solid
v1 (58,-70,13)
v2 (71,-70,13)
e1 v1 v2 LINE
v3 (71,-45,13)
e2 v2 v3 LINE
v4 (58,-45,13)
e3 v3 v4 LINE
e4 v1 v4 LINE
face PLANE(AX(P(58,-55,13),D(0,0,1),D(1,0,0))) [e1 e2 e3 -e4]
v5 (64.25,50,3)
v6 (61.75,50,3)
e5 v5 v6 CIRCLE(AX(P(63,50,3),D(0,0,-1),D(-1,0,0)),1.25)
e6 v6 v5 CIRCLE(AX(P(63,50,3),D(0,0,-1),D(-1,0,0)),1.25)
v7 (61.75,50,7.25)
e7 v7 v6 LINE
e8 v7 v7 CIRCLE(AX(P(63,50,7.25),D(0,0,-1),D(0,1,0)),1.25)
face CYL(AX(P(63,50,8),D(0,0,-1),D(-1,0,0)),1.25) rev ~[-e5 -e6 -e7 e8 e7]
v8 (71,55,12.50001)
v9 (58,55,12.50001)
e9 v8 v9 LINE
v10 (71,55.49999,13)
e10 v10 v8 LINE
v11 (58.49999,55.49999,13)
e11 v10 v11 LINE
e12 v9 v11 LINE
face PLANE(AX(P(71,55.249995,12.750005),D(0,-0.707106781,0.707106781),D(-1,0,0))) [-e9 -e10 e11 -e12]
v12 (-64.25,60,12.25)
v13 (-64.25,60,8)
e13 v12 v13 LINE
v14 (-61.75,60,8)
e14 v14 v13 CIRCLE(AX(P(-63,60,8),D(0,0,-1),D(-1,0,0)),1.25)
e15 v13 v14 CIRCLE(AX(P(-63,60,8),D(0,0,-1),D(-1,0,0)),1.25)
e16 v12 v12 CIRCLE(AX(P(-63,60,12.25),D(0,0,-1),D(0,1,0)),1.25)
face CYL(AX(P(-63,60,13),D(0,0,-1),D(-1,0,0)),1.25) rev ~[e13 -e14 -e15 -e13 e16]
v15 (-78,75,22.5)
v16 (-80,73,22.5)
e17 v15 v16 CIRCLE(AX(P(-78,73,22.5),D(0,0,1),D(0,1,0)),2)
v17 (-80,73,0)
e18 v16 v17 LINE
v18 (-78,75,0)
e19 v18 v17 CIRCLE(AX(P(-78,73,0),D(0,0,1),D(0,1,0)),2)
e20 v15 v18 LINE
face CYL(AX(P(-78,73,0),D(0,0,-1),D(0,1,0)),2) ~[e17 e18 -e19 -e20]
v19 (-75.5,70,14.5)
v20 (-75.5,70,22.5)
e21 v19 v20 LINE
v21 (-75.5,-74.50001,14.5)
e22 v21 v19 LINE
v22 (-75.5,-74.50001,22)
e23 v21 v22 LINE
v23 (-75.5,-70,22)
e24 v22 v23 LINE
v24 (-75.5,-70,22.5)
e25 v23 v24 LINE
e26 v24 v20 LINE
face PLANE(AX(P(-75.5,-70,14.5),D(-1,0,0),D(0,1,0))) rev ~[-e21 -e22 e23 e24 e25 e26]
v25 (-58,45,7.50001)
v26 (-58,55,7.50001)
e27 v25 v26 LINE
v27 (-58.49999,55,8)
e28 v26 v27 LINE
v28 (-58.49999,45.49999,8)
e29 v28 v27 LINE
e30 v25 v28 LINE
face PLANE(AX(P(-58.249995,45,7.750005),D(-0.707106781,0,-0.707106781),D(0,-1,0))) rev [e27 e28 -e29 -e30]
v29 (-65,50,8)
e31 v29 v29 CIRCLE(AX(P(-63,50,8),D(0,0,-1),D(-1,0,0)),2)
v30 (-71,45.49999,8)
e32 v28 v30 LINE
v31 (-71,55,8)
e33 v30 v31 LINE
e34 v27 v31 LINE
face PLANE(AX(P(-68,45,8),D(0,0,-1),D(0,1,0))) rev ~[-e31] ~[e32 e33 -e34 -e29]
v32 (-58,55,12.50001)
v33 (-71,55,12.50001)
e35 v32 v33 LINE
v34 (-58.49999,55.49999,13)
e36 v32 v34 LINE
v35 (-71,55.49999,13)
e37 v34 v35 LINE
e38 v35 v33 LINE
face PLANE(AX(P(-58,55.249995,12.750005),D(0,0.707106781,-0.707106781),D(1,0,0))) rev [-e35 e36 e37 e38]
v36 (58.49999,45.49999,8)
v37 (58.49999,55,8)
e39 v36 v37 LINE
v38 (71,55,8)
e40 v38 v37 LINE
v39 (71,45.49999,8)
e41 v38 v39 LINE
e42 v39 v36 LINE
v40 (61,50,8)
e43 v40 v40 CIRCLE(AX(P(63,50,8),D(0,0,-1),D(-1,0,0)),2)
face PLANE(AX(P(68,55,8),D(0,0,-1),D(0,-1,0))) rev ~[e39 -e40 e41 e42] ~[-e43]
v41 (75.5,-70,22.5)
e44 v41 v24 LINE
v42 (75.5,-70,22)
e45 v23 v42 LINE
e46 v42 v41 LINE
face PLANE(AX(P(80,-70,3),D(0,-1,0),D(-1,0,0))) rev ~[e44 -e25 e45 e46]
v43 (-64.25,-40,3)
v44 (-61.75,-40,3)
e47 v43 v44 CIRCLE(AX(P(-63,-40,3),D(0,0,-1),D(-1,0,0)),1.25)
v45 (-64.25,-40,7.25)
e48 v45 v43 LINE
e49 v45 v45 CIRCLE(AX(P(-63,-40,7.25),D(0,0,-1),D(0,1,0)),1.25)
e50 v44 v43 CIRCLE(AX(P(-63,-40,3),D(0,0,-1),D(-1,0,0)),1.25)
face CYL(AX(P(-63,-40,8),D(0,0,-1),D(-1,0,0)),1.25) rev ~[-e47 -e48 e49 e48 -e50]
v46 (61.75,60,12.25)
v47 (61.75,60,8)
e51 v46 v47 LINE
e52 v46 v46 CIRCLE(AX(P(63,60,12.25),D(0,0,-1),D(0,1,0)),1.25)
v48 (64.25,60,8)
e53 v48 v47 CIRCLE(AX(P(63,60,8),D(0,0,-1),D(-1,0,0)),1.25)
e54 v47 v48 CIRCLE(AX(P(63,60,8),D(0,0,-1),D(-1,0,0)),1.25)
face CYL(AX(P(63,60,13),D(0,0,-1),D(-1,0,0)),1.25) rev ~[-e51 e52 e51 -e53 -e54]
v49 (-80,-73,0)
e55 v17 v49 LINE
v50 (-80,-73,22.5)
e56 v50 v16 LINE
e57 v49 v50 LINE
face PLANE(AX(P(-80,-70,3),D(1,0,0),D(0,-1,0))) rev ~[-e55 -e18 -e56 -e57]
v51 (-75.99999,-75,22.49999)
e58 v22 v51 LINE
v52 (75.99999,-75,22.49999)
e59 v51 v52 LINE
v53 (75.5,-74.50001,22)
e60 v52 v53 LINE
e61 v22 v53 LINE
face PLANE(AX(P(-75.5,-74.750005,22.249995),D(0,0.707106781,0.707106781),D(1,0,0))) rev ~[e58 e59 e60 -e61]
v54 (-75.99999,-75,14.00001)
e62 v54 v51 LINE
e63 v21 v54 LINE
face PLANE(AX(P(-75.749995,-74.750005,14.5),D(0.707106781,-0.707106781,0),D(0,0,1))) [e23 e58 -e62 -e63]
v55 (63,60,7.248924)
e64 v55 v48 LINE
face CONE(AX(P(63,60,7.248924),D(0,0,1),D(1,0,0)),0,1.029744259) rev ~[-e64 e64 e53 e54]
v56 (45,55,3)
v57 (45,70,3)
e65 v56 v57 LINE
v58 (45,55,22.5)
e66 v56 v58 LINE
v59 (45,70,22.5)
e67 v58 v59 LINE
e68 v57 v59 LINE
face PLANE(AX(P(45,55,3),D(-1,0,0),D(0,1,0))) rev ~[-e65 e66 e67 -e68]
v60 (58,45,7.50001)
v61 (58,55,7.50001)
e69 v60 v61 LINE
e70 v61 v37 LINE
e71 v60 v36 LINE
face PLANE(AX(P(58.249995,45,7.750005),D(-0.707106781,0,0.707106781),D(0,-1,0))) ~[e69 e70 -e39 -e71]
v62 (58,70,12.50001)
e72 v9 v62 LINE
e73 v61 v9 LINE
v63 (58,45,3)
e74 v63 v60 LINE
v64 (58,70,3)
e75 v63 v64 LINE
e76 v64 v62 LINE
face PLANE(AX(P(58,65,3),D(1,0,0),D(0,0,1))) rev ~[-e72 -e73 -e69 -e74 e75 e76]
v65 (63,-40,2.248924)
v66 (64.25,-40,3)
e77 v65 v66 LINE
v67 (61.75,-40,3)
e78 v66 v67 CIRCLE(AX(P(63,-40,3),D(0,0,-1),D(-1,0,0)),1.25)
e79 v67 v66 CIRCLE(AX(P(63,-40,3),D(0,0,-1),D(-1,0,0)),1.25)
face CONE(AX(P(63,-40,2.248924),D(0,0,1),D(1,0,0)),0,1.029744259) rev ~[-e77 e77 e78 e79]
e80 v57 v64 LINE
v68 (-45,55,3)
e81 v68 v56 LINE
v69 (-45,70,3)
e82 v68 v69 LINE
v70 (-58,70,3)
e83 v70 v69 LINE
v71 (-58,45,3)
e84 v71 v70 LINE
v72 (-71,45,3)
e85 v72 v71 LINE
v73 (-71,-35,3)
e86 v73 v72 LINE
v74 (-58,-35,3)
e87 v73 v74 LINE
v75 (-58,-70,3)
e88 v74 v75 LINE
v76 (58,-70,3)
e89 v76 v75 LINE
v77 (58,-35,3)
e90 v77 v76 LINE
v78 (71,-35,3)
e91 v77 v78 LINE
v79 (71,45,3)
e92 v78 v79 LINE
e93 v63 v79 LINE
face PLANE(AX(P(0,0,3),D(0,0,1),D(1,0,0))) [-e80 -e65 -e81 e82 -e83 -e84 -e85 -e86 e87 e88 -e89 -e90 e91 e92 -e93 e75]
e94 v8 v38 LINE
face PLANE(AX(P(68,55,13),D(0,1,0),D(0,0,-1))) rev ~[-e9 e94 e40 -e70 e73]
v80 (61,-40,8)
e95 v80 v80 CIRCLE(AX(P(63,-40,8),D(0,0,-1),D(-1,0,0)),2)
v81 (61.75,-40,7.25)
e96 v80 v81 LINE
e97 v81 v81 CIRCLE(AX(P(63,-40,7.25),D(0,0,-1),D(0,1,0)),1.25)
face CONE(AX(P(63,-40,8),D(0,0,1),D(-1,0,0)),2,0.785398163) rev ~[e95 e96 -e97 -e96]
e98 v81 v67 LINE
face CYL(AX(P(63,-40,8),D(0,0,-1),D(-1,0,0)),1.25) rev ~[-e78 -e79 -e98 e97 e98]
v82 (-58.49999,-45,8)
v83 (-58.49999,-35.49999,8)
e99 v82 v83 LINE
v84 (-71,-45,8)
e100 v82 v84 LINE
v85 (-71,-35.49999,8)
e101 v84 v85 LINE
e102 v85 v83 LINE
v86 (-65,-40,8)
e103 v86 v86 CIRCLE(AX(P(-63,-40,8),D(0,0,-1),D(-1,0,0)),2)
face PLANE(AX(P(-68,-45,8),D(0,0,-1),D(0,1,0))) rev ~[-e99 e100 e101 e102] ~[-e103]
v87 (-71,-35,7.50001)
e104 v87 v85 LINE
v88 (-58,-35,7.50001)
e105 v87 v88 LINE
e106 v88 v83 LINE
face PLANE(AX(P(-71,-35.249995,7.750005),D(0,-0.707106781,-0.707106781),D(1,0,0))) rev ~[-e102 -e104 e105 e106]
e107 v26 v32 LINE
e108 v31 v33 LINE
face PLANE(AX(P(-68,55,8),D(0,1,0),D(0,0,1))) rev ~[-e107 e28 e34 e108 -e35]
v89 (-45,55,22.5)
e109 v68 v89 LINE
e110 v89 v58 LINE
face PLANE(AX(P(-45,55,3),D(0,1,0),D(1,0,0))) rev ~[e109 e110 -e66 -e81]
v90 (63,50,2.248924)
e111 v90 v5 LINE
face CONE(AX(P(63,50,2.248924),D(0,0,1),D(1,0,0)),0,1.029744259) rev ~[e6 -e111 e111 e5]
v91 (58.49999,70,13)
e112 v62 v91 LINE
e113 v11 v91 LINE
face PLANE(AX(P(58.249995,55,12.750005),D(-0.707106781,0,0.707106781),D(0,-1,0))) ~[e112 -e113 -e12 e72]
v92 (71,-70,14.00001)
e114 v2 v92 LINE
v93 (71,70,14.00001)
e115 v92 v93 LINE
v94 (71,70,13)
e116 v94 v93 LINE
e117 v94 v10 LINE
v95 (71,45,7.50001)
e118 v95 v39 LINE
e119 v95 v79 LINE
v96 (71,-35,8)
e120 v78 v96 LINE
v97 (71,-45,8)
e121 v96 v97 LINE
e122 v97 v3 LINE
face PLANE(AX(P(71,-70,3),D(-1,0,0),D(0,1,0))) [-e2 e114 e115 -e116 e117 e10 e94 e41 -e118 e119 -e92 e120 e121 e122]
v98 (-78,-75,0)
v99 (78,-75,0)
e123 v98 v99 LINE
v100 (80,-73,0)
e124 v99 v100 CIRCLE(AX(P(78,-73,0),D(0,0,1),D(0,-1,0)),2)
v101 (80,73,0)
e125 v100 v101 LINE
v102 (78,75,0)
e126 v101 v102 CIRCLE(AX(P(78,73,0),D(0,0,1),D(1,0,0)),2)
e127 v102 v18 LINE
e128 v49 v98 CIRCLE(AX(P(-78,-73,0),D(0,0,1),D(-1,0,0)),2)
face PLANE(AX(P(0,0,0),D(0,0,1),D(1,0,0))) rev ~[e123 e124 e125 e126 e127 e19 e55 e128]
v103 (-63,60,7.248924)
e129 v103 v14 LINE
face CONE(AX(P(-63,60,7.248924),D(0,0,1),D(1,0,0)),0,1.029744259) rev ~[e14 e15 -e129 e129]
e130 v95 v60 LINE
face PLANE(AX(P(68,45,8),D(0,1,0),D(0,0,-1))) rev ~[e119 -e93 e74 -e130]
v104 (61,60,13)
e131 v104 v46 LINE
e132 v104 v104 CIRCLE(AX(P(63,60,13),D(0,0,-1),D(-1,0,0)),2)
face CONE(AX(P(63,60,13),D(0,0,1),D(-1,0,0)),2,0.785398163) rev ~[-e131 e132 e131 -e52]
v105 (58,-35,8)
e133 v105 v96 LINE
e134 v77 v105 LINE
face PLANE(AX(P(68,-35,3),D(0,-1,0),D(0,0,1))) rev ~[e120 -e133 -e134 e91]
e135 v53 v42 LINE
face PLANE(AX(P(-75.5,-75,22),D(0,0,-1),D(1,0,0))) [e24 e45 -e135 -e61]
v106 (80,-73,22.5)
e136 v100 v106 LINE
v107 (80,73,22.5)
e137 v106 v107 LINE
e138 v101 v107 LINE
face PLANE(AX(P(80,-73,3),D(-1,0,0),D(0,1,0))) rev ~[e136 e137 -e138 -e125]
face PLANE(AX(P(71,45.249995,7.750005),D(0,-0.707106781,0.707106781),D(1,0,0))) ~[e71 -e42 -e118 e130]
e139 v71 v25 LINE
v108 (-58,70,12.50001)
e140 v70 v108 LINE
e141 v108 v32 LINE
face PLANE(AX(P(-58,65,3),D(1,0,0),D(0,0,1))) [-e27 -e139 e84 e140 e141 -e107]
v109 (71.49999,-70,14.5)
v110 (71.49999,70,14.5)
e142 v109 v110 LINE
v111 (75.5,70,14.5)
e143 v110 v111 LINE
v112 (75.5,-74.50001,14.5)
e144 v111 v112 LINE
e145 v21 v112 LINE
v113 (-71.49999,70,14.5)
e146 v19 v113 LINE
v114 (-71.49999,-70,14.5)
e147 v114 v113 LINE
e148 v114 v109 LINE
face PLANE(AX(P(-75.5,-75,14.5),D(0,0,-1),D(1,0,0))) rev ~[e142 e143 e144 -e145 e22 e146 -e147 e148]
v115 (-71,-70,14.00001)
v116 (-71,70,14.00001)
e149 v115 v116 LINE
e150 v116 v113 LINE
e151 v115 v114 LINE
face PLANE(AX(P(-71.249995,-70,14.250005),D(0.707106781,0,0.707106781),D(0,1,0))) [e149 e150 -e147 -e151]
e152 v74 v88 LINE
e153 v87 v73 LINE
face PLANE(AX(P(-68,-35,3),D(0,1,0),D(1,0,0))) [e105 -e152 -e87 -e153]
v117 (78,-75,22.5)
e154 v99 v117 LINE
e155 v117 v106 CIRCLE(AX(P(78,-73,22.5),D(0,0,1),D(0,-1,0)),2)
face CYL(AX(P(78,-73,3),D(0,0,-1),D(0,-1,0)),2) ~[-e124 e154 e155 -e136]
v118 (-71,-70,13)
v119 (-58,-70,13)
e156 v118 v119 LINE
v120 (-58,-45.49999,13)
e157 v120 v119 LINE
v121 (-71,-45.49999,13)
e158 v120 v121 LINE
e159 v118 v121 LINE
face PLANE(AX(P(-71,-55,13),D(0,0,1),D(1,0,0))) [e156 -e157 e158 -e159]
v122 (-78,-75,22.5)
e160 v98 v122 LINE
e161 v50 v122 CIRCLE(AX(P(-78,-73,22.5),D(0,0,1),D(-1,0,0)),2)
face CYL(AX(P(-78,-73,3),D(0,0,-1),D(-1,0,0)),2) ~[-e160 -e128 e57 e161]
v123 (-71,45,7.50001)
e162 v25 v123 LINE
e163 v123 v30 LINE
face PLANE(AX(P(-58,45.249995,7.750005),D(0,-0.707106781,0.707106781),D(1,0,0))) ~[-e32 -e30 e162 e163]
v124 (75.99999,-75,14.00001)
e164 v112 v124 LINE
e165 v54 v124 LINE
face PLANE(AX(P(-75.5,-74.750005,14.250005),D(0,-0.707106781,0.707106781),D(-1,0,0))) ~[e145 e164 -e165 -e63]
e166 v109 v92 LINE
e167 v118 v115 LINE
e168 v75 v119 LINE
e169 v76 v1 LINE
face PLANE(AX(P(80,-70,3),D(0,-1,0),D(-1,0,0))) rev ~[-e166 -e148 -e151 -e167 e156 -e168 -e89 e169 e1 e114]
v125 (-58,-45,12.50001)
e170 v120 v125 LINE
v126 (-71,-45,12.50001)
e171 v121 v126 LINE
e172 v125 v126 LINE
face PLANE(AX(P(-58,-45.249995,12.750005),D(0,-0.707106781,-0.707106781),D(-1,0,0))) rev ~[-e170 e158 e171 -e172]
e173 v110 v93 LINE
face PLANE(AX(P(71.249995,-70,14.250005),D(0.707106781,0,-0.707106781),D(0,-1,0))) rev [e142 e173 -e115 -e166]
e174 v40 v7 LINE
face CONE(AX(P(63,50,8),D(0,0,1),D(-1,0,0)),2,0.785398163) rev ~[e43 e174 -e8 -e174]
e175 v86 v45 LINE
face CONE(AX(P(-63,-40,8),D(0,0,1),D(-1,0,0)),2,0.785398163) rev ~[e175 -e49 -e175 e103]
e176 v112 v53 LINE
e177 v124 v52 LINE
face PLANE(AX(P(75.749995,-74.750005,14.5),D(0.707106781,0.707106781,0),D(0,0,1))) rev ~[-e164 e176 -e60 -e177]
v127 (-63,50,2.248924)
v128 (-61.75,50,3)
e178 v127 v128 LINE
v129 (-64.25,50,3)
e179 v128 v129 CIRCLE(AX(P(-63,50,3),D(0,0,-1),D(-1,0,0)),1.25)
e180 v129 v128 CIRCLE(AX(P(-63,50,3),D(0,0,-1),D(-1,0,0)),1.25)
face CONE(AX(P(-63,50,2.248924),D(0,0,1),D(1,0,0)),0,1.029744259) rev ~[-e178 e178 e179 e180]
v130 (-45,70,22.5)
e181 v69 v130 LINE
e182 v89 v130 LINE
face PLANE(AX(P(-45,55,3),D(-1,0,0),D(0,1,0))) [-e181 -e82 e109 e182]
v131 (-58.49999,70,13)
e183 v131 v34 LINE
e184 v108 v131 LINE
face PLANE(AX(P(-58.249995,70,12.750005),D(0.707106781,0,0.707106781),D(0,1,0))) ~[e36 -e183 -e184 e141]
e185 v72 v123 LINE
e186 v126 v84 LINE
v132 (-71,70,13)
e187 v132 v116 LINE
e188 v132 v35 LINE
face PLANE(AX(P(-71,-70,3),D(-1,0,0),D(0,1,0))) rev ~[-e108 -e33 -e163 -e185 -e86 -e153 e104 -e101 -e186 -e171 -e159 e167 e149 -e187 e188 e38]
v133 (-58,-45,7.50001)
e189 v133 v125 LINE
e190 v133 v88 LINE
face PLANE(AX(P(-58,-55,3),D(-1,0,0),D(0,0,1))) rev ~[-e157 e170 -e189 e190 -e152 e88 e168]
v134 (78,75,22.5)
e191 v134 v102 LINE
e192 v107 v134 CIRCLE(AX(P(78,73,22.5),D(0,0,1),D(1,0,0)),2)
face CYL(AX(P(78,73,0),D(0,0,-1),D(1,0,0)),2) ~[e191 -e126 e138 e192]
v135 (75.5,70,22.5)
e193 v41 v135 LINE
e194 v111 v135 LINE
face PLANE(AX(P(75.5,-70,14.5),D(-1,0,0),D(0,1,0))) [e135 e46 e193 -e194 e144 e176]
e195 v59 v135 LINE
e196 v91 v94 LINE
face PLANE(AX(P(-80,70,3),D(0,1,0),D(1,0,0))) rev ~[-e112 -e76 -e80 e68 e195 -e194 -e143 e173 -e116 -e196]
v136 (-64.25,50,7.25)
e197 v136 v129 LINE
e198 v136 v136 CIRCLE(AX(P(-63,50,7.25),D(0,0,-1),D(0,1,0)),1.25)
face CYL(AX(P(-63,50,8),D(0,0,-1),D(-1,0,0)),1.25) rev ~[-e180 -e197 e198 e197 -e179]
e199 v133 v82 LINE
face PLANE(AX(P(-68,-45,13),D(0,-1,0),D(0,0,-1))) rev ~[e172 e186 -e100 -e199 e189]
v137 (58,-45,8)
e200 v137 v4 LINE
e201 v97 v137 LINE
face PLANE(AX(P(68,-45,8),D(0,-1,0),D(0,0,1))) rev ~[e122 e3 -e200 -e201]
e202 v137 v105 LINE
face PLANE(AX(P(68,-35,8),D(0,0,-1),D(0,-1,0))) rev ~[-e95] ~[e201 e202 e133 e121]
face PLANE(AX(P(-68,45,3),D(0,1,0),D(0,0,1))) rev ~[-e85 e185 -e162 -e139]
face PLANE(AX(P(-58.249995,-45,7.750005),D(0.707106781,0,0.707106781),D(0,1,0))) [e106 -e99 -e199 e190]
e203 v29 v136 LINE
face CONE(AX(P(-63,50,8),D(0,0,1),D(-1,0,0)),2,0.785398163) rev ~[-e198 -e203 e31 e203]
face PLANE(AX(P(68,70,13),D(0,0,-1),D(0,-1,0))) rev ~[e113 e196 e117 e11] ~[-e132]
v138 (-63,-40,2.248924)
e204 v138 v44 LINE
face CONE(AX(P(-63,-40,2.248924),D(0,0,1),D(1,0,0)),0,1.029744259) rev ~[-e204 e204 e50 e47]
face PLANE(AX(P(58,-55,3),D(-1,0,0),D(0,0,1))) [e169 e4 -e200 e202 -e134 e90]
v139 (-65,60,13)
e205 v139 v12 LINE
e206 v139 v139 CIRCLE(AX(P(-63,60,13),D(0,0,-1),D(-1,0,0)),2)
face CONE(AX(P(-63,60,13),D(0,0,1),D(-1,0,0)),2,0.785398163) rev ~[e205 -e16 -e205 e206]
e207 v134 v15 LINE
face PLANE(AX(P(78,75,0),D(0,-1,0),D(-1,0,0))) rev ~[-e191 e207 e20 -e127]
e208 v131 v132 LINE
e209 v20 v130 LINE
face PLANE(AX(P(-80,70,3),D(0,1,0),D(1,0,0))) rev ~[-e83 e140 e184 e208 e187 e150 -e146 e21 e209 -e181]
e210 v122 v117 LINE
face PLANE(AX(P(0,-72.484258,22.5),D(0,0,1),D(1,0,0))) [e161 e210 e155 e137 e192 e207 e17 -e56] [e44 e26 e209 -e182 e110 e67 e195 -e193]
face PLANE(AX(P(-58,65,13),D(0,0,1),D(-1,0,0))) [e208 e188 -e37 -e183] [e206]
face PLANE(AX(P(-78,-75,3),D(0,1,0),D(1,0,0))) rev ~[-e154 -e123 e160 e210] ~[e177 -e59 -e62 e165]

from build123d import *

# Parameters (mm, degrees)
F1_DEPTH             = 3
F2_W                 = 10
F2_H                 = 10
F3_DEPTH             = 5
F5_W                 = 10
F5_H                 = 10
F6_DEPTH             = 10
F8_D                 = 2.5
F8_DEPTH             = 5
F8_CSINK_D           = 4
F8_CSINK_ANGLE       = 90
F8_TIP               = 0.7510757738
F8_ON_F4_D           = 2.5
F8_ON_F4_DEPTH       = 5
F8_ON_F4_CSINK_D     = 4
F8_ON_F4_CSINK_ANGLE = 90
F8_ON_F4_TIP         = 0.7510757738
F9_W                 = 9
F9_H                 = 140
F10_DEPTH            = 11.5
F11_W                = 4.5
F11_H                = 140
F12_DEPTH            = 8
F14_DEPTH            = 19.5
F15_W                = 151
F15_H                = 7.5
F16_DEPTH            = 5
F18_DEPTH            = 3
F19_W                = 13
F19_H                = 10
F19_W_2              = 10
F20_DEPTH            = 5
F22_DEPTH            = 3
F23_W                = 13
F23_H                = 10
F24_DEPTH            = 15
F25_W                = 90
F25_H                = 15
F26_DEPTH            = 19.5
F27_SIZE             = 0.49999


# Not quite as in the source:
# - a fillet or chamfer is up to 0.001 mm smaller than in the source, because OpenCascade refuses the exact size
# - a feature names something its author has since deleted; it is built from what else it names


with BuildPart() as f1:
    # F0 (on Top) → F1 (new body)
    with BuildSketch(Plane.XY):
        with BuildLine():
            Line((-78, -75), (78, -75))
            ThreePointArc((78, -75), (79.4142135624, -74.4142135624), (80, -73))
            Line((80, -73), (80, 73))
            ThreePointArc((80, 73), (79.4142135624, 74.4142135624), (78, 75))
            Line((78, 75), (-78, 75))
            ThreePointArc((-78, 75), (-79.4142135624, 74.4142135624), (-80, 73))
            Line((-80, 73), (-80, -73))
            ThreePointArc((-80, -73), (-79.4142135624, -74.4142135624), (-78, -75))
        make_face()
    extrude(amount=F1_DEPTH)

    # F2 (on face) → F3 (join)
    with BuildSketch(Plane.XY.offset(3)):
        with Locations((-63, -40)):
            Rectangle(F2_W, F2_H)
        with Locations((-63, 50)):
            Rectangle(F2_W, F2_H)
        with Locations((63, 50)):
            Rectangle(F2_W, F2_H)
        with Locations((63, -40)):
            Rectangle(F2_W, F2_H)
    extrude(amount=F3_DEPTH)

    # F5 (on face) → F6 (join)
    with BuildSketch(Plane.XY.offset(3)):
        with Locations((-63, 60)):
            Rectangle(F5_W, F5_H)
        with Locations((-63, -50)):
            Rectangle(F5_W, F5_H)
        with Locations((63, 60)):
            Rectangle(F5_W, F5_H)
        with Locations((63, -50)):
            Rectangle(F5_W, F5_H)
    extrude(amount=F6_DEPTH)

    # F8
    with Locations(Plane.XY.offset(13)):
        with Locations((-63, 60), (63, 60)):
            CounterSinkHole(F8_D / 2, F8_CSINK_D / 2, depth=F8_DEPTH, counter_sink_angle=F8_CSINK_ANGLE)
            with Locations((0, 0, -(F8_DEPTH + F8_TIP / 2))):  # 118° drill point
                Cone(0, F8_D / 2, F8_TIP, mode=Mode.SUBTRACT)

    # F8 on F4
    with Locations(Plane.XY.offset(8)):
        with Locations((-63, -40), (63, -40), (-63, 50), (63, 50)):
            CounterSinkHole(F8_ON_F4_D / 2, F8_ON_F4_CSINK_D / 2, depth=F8_ON_F4_DEPTH, counter_sink_angle=F8_ON_F4_CSINK_ANGLE)
            with Locations((0, 0, -(F8_ON_F4_DEPTH + F8_ON_F4_TIP / 2))):  # 118° drill point
                Cone(0, F8_ON_F4_D / 2, F8_ON_F4_TIP, mode=Mode.SUBTRACT)

    # F9 (on face) → F10 (join)
    with BuildSketch(Plane.XY.offset(3)):
        with Locations((-75.5, 0)):
            Rectangle(F9_W, F9_H)
        with Locations((75.5, 0)):
            Rectangle(F9_W, F9_H)
    extrude(amount=F10_DEPTH)

    # F11 (on face) → F12 (join)
    with BuildSketch(Plane.XY.offset(14.5)):
        with Locations((-77.75, 0)):
            Rectangle(F11_W, F11_H)
        with Locations((77.75, 0)):
            Rectangle(F11_W, F11_H)
    extrude(amount=F12_DEPTH)

    # F13 (on face) → F14 (join, through all)
    with BuildSketch(Plane.XY.offset(3)):
        with BuildLine():
            Line((-80, -70), (-80, -73))
            ThreePointArc((-80, -73), (-79.4142135624, -74.4142135624), (-78, -75))
            Line((-78, -75), (78, -75))
            ThreePointArc((78, -75), (79.4142135624, -74.4142135624), (80, -73))
            Line((80, -73), (80, -70))
            Line((80, -70), (-80, -70))
        make_face()
        with BuildLine():
            Line((-80, 73), (-80, 70))
            Line((-80, 70), (80, 70))
            Line((80, 70), (80, 73))
            ThreePointArc((80, 73), (79.4142135624, 74.4142135624), (78, 75))
            Line((78, 75), (-78, 75))
            ThreePointArc((-78, 75), (-79.4142135624, 74.4142135624), (-80, 73))
        make_face()
    extrude(amount=F14_DEPTH)

    # F15 (on face) → F16 (cut, through all)
    with BuildSketch(Plane.XZ.offset(75)):
        with Locations((0, 18.25)):
            Rectangle(F15_W, F15_H)
    extrude(amount=-F16_DEPTH, mode=Mode.SUBTRACT)

    # F17 (on face) → F18 (join, through all)
    with BuildSketch(Plane(origin=(-68, 0, 0), x_dir=(0, -1, 0), z_dir=(-1, 0, 0))):
        Polygon((-65, 3), (-45, 3), (-45, 8), (-55, 8), (-55, 13), (-65, 13), align=None)
        Polygon((35, 3), (55, 3), (55, 13), (45, 13), (45, 8), (35, 8), align=None)
    extrude(amount=F18_DEPTH)

    # F19 (on face) → F20 (join, through all)
    with BuildSketch(Plane(origin=(0, 65, 0), x_dir=(-1, 0, 0), z_dir=(0, 1, 0))):
        with Locations((64.5, 8)):
            Rectangle(F19_W, F19_H)
        with Locations((-63, 8)):
            Rectangle(F19_W_2, F19_H)
    extrude(amount=F20_DEPTH)

    # F21 (on face) → F22 (join, through all)
    with BuildSketch(Plane.YZ.offset(68)):
        Polygon((45, 8), (45, 3), (70, 3), (70, 13), (55, 13), (55, 8), align=None)
        Polygon((-55, 13), (-55, 3), (-35, 3), (-35, 8), (-45, 8), (-45, 13), align=None)
    extrude(amount=F22_DEPTH)

    # F23 (on face) → F24 (join, through all)
    with BuildSketch(Plane.XZ.offset(55)):
        with Locations((64.5, 8)):
            Rectangle(F23_W, F23_H)
        with Locations((-64.5, 8)):
            Rectangle(F23_W, F23_H)
    extrude(amount=F24_DEPTH)

    # F25 (on face) → F26 (join, through all)
    with BuildSketch(Plane.XY.offset(3)):
        with Locations((0, 62.5)):
            Rectangle(F25_W, F25_H)
    extrude(amount=F26_DEPTH)

    # F27 (size 0.5 in the source; OpenCascade refuses exactly that, so slightly less here)
    f27_edges = [f1.edges().sort_by_distance(p)[0] for p in [
        (71, 0, 14.5),
        (-71, 0, 14.5),
        (-58, 62.5, 13),
        (-64.5, 55, 13),
        (-58, 50, 8),
        (-64.5, 45, 8),
        (-64.5, -45, 13),
        (-58, -40, 8),
        (-64.5, -35, 8),
        (58, 62.5, 13),
        (64.5, 55, 13),
        (58, 50, 8),
        (64.5, 45, 8),
        (-75.5, -75, 18.25),
        (0, -75, 14.5),
        (0, -75, 22),
        (75.5, -75, 18.25),
    ]]
    chamfer(f27_edges, length=F27_SIZE)


solid = f1.part
